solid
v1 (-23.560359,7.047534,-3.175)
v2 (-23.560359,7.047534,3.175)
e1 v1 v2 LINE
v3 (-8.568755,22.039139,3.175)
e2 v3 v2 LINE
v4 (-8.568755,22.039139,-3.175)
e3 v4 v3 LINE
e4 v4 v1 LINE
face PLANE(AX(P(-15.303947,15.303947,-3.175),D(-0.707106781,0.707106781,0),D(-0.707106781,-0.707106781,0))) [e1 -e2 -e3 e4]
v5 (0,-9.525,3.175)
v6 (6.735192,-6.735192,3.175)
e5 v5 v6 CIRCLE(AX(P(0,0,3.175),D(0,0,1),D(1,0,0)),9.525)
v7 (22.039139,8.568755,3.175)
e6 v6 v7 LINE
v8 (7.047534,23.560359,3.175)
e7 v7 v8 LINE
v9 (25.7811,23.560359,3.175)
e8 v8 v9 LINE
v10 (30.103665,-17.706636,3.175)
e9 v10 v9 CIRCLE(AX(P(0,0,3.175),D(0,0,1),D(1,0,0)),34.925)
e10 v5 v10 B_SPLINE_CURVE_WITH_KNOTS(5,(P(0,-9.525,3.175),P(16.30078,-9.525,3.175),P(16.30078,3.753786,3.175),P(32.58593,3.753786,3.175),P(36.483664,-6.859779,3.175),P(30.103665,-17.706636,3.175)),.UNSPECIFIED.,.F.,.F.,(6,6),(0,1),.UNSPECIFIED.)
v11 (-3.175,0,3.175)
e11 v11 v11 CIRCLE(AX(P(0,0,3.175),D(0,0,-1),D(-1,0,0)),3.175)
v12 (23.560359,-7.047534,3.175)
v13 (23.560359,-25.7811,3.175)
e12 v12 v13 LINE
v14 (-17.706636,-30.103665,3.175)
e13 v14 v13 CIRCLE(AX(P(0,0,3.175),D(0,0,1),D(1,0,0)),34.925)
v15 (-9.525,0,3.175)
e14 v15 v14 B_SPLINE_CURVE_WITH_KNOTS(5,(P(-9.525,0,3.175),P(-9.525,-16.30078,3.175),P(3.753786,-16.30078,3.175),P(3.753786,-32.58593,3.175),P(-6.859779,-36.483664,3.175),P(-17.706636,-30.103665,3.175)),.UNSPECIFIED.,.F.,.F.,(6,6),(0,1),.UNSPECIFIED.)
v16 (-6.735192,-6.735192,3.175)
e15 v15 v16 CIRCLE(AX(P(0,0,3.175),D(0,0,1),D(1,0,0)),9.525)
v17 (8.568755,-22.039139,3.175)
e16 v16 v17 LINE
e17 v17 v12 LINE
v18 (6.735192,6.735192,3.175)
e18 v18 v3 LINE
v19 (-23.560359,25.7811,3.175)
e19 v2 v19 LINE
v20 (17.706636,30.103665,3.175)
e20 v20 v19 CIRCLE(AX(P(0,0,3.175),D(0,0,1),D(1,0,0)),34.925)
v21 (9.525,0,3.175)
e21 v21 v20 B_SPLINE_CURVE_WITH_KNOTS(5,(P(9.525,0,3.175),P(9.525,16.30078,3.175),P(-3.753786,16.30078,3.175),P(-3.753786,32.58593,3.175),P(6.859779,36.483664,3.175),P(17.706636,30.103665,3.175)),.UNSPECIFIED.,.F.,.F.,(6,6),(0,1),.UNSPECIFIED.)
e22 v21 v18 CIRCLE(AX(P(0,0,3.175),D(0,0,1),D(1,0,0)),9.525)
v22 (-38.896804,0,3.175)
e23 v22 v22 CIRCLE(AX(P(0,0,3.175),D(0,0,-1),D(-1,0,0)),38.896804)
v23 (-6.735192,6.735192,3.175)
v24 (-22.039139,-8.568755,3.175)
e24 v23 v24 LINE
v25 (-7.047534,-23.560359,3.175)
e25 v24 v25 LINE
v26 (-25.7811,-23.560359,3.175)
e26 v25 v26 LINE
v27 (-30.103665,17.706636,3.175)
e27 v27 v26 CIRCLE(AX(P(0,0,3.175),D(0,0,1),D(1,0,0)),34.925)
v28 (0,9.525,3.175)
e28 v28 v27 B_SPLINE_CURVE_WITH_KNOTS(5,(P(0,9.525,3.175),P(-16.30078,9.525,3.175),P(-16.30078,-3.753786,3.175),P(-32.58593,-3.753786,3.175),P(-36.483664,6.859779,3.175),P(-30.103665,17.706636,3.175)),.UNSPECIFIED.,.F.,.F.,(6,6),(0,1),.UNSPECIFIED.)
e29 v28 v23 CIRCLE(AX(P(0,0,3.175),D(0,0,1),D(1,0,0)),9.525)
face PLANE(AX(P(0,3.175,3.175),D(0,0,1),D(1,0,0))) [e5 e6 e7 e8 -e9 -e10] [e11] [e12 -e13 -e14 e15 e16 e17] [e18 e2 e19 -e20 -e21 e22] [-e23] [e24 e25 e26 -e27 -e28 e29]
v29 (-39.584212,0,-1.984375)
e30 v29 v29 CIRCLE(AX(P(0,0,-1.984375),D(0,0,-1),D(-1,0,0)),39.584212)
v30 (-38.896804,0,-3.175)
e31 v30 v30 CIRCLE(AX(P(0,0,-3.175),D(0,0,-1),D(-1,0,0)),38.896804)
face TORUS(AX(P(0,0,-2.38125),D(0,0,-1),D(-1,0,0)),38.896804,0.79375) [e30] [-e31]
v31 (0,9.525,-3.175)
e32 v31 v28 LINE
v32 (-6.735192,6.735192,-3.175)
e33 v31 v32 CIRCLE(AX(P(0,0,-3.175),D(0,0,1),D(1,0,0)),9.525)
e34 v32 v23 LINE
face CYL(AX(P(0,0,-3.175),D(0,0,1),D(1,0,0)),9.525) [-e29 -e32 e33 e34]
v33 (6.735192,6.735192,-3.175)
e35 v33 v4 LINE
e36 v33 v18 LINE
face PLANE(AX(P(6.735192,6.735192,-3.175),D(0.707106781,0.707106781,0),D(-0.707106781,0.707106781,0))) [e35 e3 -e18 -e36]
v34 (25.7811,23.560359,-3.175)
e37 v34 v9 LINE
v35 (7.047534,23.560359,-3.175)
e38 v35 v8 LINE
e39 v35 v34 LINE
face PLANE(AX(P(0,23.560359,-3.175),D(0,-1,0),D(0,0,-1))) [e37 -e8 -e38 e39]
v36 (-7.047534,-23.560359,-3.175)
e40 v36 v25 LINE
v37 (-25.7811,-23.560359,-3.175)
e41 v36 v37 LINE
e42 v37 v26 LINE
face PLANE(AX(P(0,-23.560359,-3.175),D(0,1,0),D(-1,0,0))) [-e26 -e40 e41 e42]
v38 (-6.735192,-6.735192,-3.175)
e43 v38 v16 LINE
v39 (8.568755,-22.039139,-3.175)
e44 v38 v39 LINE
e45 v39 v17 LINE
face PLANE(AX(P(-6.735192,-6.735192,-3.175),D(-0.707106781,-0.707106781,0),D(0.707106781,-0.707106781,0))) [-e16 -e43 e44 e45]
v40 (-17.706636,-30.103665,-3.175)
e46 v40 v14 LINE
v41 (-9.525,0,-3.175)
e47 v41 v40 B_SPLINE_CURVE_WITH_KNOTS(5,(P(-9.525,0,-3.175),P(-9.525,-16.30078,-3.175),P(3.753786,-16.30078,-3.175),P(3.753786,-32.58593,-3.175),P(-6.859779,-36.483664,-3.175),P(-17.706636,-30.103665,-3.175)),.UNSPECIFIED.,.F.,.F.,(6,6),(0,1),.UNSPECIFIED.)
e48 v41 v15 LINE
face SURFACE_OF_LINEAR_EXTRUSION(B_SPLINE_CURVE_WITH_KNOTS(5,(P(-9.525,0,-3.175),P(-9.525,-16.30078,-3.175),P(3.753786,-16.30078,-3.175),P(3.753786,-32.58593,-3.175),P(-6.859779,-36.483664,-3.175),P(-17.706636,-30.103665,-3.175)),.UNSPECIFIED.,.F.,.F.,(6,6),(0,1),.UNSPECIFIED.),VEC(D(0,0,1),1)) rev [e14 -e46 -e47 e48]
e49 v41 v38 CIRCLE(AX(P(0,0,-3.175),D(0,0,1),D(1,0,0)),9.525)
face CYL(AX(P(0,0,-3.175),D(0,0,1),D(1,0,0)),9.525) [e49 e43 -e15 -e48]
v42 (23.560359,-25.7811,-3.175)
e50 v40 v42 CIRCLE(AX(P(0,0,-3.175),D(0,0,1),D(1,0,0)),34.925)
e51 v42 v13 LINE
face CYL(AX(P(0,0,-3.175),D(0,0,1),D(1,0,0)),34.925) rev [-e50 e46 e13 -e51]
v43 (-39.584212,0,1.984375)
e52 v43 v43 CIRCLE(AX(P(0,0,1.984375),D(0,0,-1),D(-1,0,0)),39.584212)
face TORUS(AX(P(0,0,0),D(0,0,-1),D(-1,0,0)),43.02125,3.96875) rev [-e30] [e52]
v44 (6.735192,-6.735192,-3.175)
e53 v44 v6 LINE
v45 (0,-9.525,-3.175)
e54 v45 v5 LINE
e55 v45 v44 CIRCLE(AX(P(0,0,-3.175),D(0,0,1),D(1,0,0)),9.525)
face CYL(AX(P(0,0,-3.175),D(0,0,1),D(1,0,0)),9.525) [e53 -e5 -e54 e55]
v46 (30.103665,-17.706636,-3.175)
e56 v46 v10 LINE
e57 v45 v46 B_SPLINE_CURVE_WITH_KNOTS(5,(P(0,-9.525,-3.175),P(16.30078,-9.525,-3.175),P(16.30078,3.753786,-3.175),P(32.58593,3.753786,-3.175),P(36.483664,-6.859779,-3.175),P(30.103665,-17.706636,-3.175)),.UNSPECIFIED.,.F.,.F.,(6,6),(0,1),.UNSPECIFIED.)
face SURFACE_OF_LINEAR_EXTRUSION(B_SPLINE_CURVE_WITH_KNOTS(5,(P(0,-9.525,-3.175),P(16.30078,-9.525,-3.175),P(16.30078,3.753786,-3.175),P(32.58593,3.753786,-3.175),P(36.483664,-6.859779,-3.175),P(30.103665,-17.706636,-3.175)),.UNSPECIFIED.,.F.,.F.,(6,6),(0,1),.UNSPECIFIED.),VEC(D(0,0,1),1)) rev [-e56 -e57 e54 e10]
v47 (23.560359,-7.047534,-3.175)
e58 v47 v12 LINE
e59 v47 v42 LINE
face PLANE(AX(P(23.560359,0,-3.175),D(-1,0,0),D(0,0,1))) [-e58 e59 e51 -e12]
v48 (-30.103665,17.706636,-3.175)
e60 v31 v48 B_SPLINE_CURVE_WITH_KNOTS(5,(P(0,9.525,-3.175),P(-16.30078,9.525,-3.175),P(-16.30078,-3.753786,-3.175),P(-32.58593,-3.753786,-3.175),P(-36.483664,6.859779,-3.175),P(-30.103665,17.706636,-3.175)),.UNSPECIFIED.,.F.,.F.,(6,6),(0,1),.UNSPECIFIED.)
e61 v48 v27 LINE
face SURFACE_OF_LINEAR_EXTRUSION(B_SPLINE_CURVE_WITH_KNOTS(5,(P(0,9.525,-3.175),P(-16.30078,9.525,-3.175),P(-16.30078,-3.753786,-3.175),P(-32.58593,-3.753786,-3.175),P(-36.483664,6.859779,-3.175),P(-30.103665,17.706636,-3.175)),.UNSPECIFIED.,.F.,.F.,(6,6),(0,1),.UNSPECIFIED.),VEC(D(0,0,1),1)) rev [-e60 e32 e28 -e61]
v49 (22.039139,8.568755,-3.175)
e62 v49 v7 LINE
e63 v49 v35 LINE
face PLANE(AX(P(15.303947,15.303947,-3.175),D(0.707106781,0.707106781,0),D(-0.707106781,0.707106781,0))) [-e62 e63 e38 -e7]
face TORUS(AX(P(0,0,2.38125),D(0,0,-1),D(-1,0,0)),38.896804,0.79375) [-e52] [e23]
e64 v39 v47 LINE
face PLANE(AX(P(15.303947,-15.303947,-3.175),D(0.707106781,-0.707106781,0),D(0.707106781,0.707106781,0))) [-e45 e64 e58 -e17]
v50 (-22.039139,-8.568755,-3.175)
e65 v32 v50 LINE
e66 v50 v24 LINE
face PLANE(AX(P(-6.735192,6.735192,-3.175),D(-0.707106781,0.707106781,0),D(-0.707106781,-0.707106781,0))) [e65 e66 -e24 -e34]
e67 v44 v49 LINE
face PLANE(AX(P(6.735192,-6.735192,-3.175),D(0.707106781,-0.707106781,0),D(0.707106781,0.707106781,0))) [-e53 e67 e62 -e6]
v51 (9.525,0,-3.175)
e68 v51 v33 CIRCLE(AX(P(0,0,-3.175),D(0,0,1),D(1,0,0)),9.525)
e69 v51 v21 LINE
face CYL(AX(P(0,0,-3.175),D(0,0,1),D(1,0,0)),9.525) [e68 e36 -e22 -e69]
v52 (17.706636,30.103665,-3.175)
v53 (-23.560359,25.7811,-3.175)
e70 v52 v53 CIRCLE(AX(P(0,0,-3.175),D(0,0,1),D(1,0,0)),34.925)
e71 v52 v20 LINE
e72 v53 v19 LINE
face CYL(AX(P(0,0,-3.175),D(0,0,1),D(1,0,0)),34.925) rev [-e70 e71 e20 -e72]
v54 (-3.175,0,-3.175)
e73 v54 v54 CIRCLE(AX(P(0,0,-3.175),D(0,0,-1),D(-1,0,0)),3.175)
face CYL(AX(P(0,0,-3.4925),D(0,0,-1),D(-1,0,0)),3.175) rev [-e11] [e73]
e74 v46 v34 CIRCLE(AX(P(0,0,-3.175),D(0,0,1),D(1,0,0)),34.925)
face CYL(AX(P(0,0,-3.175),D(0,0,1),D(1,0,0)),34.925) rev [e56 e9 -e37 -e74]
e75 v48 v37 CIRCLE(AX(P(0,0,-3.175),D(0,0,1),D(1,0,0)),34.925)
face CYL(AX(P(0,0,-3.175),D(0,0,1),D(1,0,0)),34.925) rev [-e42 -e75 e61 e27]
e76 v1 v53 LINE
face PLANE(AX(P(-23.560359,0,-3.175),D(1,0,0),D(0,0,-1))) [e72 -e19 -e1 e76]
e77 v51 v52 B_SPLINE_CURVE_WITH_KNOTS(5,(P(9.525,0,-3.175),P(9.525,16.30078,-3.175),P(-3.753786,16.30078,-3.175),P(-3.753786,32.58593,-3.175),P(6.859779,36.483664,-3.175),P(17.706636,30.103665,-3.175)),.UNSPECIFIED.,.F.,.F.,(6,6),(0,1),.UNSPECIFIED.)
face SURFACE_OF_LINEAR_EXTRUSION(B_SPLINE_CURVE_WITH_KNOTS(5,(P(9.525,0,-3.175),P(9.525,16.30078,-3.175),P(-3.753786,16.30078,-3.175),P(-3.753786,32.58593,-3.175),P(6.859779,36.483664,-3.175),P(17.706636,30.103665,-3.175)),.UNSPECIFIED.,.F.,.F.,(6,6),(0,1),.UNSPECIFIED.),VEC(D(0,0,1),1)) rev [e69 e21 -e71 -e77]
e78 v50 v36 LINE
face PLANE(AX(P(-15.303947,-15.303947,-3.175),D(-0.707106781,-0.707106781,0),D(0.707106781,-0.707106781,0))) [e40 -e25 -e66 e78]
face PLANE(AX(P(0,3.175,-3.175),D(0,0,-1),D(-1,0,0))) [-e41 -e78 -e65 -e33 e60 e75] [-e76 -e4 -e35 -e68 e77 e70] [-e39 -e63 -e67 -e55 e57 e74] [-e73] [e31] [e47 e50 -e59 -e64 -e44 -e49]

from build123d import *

# Parameters (mm, degrees)
CUT_EXTRUDE1_START = -6.35
CUT_EXTRUDE1_DEPTH = 6.35


# Read off the part's stored shape, not the designer's step: Cut-Extrude1
with BuildPart() as part:
    # Sketch1 → Revolve1 (revolve)
    with BuildSketch(Plane(origin=(0, 0, 0), x_dir=(0, 0, -1), z_dir=(1, 0, 0)), mode=Mode.PRIVATE) as revolve1_sk:
        with BuildLine():
            Line((-3.175, 3.175), (3.175, 3.175))
            Line((3.175, 3.175), (3.175, 38.896804014))
            ThreePointArc((3.175, 38.896804014), (2.778125, 39.584211679), (1.984375, 39.584211679))
            ThreePointArc((1.984375, 39.584211679), (0, 39.0525), (-1.984375, 39.584211679))
            ThreePointArc((-1.984375, 39.584211679), (-2.778125, 39.584211679), (-3.175, 38.896804014))
            Line((-3.175, 38.896804014), (-3.175, 3.175))
        make_face()
    revolve(revolve1_sk.sketch.rotate(Axis((0, 0, -3.4925), (0, 0, 1)), 90), axis=Axis((0, 0, -3.4925), (0, 0, 1)))

    # Cut-Extrude1 outline → Cut-Extrude1 (cut)
    with BuildSketch(Plane.XY.offset(3.175).offset(CUT_EXTRUDE1_START)):
        with BuildLine():
            ThreePointArc((6.735192091, 6.735192091), (8.799952547, 3.645059693), (9.525, 0))
            add(Edge.make_bspline(
                [(9.525, 0), (9.525, 16.300780004), (-3.753785862, 16.300780004), (-3.753785862, 32.585930164), (6.859779029, 36.483664171), (17.706636116, 30.103665266)],
                knots=[0, 0, 0, 0, 0, 0, 1, 1, 1, 1, 1, 1], degree=5))
            ThreePointArc((17.706636116, 30.103665266), (-3.638359508, 34.734967469), (-23.560358803, 25.781100017))
            Line((-23.560358803, 25.781100017), (-23.560358803, 7.047534491))
            Line((-23.560358803, 7.047534491), (-8.568754556, 22.039138738))
            Line((-8.568754556, 22.039138738), (6.735192091, 6.735192091))
        make_face()
        with BuildLine():
            ThreePointArc((-6.735192091, 6.735192091), (-3.645059693, 8.799952547), (0, 9.525))
            add(Edge.make_bspline(
                [(0, 9.525), (-16.300780004, 9.525), (-16.300780004, -3.753785862), (-32.585930164, -3.753785862), (-36.483664171, 6.859779029), (-30.103665266, 17.706636116)],
                knots=[0, 0, 0, 0, 0, 0, 1, 1, 1, 1, 1, 1], degree=5))
            ThreePointArc((-30.103665266, 17.706636116), (-34.734967469, -3.638359508), (-25.781100017, -23.560358803))
            Line((-25.781100017, -23.560358803), (-7.047534491, -23.560358803))
            Line((-7.047534491, -23.560358803), (-22.039138738, -8.568754556))
            Line((-22.039138738, -8.568754556), (-6.735192091, 6.735192091))
        make_face()
        with BuildLine():
            ThreePointArc((6.735192091, -6.735192091), (3.645059693, -8.799952547), (0, -9.525))
            add(Edge.make_bspline(
                [(0, -9.525), (16.300780004, -9.525), (16.300780004, 3.753785862), (32.585930164, 3.753785862), (36.483664171, -6.859779029), (30.103665266, -17.706636116)],
                knots=[0, 0, 0, 0, 0, 0, 1, 1, 1, 1, 1, 1], degree=5))
            ThreePointArc((30.103665266, -17.706636116), (34.734967469, 3.638359508), (25.781100017, 23.560358803))
            Line((25.781100017, 23.560358803), (7.047534491, 23.560358803))
            Line((7.047534491, 23.560358803), (22.039138738, 8.568754556))
            Line((22.039138738, 8.568754556), (6.735192091, -6.735192091))
        make_face()
        with BuildLine():
            ThreePointArc((-6.735192091, -6.735192091), (-8.799952547, -3.645059693), (-9.525, 0))
            add(Edge.make_bspline(
                [(-9.525, 0), (-9.525, -16.300780004), (3.753785862, -16.300780004), (3.753785862, -32.585930164), (-6.859779029, -36.483664171), (-17.706636116, -30.103665266)],
                knots=[0, 0, 0, 0, 0, 0, 1, 1, 1, 1, 1, 1], degree=5))
            ThreePointArc((-17.706636116, -30.103665266), (3.638359508, -34.734967469), (23.560358803, -25.781100017))
            Line((23.560358803, -25.781100017), (23.560358803, -7.047534491))
            Line((23.560358803, -7.047534491), (8.568754556, -22.039138738))
            Line((8.568754556, -22.039138738), (-6.735192091, -6.735192091))
        make_face()
    extrude(amount=CUT_EXTRUDE1_DEPTH, mode=Mode.SUBTRACT)


solid = part.part
